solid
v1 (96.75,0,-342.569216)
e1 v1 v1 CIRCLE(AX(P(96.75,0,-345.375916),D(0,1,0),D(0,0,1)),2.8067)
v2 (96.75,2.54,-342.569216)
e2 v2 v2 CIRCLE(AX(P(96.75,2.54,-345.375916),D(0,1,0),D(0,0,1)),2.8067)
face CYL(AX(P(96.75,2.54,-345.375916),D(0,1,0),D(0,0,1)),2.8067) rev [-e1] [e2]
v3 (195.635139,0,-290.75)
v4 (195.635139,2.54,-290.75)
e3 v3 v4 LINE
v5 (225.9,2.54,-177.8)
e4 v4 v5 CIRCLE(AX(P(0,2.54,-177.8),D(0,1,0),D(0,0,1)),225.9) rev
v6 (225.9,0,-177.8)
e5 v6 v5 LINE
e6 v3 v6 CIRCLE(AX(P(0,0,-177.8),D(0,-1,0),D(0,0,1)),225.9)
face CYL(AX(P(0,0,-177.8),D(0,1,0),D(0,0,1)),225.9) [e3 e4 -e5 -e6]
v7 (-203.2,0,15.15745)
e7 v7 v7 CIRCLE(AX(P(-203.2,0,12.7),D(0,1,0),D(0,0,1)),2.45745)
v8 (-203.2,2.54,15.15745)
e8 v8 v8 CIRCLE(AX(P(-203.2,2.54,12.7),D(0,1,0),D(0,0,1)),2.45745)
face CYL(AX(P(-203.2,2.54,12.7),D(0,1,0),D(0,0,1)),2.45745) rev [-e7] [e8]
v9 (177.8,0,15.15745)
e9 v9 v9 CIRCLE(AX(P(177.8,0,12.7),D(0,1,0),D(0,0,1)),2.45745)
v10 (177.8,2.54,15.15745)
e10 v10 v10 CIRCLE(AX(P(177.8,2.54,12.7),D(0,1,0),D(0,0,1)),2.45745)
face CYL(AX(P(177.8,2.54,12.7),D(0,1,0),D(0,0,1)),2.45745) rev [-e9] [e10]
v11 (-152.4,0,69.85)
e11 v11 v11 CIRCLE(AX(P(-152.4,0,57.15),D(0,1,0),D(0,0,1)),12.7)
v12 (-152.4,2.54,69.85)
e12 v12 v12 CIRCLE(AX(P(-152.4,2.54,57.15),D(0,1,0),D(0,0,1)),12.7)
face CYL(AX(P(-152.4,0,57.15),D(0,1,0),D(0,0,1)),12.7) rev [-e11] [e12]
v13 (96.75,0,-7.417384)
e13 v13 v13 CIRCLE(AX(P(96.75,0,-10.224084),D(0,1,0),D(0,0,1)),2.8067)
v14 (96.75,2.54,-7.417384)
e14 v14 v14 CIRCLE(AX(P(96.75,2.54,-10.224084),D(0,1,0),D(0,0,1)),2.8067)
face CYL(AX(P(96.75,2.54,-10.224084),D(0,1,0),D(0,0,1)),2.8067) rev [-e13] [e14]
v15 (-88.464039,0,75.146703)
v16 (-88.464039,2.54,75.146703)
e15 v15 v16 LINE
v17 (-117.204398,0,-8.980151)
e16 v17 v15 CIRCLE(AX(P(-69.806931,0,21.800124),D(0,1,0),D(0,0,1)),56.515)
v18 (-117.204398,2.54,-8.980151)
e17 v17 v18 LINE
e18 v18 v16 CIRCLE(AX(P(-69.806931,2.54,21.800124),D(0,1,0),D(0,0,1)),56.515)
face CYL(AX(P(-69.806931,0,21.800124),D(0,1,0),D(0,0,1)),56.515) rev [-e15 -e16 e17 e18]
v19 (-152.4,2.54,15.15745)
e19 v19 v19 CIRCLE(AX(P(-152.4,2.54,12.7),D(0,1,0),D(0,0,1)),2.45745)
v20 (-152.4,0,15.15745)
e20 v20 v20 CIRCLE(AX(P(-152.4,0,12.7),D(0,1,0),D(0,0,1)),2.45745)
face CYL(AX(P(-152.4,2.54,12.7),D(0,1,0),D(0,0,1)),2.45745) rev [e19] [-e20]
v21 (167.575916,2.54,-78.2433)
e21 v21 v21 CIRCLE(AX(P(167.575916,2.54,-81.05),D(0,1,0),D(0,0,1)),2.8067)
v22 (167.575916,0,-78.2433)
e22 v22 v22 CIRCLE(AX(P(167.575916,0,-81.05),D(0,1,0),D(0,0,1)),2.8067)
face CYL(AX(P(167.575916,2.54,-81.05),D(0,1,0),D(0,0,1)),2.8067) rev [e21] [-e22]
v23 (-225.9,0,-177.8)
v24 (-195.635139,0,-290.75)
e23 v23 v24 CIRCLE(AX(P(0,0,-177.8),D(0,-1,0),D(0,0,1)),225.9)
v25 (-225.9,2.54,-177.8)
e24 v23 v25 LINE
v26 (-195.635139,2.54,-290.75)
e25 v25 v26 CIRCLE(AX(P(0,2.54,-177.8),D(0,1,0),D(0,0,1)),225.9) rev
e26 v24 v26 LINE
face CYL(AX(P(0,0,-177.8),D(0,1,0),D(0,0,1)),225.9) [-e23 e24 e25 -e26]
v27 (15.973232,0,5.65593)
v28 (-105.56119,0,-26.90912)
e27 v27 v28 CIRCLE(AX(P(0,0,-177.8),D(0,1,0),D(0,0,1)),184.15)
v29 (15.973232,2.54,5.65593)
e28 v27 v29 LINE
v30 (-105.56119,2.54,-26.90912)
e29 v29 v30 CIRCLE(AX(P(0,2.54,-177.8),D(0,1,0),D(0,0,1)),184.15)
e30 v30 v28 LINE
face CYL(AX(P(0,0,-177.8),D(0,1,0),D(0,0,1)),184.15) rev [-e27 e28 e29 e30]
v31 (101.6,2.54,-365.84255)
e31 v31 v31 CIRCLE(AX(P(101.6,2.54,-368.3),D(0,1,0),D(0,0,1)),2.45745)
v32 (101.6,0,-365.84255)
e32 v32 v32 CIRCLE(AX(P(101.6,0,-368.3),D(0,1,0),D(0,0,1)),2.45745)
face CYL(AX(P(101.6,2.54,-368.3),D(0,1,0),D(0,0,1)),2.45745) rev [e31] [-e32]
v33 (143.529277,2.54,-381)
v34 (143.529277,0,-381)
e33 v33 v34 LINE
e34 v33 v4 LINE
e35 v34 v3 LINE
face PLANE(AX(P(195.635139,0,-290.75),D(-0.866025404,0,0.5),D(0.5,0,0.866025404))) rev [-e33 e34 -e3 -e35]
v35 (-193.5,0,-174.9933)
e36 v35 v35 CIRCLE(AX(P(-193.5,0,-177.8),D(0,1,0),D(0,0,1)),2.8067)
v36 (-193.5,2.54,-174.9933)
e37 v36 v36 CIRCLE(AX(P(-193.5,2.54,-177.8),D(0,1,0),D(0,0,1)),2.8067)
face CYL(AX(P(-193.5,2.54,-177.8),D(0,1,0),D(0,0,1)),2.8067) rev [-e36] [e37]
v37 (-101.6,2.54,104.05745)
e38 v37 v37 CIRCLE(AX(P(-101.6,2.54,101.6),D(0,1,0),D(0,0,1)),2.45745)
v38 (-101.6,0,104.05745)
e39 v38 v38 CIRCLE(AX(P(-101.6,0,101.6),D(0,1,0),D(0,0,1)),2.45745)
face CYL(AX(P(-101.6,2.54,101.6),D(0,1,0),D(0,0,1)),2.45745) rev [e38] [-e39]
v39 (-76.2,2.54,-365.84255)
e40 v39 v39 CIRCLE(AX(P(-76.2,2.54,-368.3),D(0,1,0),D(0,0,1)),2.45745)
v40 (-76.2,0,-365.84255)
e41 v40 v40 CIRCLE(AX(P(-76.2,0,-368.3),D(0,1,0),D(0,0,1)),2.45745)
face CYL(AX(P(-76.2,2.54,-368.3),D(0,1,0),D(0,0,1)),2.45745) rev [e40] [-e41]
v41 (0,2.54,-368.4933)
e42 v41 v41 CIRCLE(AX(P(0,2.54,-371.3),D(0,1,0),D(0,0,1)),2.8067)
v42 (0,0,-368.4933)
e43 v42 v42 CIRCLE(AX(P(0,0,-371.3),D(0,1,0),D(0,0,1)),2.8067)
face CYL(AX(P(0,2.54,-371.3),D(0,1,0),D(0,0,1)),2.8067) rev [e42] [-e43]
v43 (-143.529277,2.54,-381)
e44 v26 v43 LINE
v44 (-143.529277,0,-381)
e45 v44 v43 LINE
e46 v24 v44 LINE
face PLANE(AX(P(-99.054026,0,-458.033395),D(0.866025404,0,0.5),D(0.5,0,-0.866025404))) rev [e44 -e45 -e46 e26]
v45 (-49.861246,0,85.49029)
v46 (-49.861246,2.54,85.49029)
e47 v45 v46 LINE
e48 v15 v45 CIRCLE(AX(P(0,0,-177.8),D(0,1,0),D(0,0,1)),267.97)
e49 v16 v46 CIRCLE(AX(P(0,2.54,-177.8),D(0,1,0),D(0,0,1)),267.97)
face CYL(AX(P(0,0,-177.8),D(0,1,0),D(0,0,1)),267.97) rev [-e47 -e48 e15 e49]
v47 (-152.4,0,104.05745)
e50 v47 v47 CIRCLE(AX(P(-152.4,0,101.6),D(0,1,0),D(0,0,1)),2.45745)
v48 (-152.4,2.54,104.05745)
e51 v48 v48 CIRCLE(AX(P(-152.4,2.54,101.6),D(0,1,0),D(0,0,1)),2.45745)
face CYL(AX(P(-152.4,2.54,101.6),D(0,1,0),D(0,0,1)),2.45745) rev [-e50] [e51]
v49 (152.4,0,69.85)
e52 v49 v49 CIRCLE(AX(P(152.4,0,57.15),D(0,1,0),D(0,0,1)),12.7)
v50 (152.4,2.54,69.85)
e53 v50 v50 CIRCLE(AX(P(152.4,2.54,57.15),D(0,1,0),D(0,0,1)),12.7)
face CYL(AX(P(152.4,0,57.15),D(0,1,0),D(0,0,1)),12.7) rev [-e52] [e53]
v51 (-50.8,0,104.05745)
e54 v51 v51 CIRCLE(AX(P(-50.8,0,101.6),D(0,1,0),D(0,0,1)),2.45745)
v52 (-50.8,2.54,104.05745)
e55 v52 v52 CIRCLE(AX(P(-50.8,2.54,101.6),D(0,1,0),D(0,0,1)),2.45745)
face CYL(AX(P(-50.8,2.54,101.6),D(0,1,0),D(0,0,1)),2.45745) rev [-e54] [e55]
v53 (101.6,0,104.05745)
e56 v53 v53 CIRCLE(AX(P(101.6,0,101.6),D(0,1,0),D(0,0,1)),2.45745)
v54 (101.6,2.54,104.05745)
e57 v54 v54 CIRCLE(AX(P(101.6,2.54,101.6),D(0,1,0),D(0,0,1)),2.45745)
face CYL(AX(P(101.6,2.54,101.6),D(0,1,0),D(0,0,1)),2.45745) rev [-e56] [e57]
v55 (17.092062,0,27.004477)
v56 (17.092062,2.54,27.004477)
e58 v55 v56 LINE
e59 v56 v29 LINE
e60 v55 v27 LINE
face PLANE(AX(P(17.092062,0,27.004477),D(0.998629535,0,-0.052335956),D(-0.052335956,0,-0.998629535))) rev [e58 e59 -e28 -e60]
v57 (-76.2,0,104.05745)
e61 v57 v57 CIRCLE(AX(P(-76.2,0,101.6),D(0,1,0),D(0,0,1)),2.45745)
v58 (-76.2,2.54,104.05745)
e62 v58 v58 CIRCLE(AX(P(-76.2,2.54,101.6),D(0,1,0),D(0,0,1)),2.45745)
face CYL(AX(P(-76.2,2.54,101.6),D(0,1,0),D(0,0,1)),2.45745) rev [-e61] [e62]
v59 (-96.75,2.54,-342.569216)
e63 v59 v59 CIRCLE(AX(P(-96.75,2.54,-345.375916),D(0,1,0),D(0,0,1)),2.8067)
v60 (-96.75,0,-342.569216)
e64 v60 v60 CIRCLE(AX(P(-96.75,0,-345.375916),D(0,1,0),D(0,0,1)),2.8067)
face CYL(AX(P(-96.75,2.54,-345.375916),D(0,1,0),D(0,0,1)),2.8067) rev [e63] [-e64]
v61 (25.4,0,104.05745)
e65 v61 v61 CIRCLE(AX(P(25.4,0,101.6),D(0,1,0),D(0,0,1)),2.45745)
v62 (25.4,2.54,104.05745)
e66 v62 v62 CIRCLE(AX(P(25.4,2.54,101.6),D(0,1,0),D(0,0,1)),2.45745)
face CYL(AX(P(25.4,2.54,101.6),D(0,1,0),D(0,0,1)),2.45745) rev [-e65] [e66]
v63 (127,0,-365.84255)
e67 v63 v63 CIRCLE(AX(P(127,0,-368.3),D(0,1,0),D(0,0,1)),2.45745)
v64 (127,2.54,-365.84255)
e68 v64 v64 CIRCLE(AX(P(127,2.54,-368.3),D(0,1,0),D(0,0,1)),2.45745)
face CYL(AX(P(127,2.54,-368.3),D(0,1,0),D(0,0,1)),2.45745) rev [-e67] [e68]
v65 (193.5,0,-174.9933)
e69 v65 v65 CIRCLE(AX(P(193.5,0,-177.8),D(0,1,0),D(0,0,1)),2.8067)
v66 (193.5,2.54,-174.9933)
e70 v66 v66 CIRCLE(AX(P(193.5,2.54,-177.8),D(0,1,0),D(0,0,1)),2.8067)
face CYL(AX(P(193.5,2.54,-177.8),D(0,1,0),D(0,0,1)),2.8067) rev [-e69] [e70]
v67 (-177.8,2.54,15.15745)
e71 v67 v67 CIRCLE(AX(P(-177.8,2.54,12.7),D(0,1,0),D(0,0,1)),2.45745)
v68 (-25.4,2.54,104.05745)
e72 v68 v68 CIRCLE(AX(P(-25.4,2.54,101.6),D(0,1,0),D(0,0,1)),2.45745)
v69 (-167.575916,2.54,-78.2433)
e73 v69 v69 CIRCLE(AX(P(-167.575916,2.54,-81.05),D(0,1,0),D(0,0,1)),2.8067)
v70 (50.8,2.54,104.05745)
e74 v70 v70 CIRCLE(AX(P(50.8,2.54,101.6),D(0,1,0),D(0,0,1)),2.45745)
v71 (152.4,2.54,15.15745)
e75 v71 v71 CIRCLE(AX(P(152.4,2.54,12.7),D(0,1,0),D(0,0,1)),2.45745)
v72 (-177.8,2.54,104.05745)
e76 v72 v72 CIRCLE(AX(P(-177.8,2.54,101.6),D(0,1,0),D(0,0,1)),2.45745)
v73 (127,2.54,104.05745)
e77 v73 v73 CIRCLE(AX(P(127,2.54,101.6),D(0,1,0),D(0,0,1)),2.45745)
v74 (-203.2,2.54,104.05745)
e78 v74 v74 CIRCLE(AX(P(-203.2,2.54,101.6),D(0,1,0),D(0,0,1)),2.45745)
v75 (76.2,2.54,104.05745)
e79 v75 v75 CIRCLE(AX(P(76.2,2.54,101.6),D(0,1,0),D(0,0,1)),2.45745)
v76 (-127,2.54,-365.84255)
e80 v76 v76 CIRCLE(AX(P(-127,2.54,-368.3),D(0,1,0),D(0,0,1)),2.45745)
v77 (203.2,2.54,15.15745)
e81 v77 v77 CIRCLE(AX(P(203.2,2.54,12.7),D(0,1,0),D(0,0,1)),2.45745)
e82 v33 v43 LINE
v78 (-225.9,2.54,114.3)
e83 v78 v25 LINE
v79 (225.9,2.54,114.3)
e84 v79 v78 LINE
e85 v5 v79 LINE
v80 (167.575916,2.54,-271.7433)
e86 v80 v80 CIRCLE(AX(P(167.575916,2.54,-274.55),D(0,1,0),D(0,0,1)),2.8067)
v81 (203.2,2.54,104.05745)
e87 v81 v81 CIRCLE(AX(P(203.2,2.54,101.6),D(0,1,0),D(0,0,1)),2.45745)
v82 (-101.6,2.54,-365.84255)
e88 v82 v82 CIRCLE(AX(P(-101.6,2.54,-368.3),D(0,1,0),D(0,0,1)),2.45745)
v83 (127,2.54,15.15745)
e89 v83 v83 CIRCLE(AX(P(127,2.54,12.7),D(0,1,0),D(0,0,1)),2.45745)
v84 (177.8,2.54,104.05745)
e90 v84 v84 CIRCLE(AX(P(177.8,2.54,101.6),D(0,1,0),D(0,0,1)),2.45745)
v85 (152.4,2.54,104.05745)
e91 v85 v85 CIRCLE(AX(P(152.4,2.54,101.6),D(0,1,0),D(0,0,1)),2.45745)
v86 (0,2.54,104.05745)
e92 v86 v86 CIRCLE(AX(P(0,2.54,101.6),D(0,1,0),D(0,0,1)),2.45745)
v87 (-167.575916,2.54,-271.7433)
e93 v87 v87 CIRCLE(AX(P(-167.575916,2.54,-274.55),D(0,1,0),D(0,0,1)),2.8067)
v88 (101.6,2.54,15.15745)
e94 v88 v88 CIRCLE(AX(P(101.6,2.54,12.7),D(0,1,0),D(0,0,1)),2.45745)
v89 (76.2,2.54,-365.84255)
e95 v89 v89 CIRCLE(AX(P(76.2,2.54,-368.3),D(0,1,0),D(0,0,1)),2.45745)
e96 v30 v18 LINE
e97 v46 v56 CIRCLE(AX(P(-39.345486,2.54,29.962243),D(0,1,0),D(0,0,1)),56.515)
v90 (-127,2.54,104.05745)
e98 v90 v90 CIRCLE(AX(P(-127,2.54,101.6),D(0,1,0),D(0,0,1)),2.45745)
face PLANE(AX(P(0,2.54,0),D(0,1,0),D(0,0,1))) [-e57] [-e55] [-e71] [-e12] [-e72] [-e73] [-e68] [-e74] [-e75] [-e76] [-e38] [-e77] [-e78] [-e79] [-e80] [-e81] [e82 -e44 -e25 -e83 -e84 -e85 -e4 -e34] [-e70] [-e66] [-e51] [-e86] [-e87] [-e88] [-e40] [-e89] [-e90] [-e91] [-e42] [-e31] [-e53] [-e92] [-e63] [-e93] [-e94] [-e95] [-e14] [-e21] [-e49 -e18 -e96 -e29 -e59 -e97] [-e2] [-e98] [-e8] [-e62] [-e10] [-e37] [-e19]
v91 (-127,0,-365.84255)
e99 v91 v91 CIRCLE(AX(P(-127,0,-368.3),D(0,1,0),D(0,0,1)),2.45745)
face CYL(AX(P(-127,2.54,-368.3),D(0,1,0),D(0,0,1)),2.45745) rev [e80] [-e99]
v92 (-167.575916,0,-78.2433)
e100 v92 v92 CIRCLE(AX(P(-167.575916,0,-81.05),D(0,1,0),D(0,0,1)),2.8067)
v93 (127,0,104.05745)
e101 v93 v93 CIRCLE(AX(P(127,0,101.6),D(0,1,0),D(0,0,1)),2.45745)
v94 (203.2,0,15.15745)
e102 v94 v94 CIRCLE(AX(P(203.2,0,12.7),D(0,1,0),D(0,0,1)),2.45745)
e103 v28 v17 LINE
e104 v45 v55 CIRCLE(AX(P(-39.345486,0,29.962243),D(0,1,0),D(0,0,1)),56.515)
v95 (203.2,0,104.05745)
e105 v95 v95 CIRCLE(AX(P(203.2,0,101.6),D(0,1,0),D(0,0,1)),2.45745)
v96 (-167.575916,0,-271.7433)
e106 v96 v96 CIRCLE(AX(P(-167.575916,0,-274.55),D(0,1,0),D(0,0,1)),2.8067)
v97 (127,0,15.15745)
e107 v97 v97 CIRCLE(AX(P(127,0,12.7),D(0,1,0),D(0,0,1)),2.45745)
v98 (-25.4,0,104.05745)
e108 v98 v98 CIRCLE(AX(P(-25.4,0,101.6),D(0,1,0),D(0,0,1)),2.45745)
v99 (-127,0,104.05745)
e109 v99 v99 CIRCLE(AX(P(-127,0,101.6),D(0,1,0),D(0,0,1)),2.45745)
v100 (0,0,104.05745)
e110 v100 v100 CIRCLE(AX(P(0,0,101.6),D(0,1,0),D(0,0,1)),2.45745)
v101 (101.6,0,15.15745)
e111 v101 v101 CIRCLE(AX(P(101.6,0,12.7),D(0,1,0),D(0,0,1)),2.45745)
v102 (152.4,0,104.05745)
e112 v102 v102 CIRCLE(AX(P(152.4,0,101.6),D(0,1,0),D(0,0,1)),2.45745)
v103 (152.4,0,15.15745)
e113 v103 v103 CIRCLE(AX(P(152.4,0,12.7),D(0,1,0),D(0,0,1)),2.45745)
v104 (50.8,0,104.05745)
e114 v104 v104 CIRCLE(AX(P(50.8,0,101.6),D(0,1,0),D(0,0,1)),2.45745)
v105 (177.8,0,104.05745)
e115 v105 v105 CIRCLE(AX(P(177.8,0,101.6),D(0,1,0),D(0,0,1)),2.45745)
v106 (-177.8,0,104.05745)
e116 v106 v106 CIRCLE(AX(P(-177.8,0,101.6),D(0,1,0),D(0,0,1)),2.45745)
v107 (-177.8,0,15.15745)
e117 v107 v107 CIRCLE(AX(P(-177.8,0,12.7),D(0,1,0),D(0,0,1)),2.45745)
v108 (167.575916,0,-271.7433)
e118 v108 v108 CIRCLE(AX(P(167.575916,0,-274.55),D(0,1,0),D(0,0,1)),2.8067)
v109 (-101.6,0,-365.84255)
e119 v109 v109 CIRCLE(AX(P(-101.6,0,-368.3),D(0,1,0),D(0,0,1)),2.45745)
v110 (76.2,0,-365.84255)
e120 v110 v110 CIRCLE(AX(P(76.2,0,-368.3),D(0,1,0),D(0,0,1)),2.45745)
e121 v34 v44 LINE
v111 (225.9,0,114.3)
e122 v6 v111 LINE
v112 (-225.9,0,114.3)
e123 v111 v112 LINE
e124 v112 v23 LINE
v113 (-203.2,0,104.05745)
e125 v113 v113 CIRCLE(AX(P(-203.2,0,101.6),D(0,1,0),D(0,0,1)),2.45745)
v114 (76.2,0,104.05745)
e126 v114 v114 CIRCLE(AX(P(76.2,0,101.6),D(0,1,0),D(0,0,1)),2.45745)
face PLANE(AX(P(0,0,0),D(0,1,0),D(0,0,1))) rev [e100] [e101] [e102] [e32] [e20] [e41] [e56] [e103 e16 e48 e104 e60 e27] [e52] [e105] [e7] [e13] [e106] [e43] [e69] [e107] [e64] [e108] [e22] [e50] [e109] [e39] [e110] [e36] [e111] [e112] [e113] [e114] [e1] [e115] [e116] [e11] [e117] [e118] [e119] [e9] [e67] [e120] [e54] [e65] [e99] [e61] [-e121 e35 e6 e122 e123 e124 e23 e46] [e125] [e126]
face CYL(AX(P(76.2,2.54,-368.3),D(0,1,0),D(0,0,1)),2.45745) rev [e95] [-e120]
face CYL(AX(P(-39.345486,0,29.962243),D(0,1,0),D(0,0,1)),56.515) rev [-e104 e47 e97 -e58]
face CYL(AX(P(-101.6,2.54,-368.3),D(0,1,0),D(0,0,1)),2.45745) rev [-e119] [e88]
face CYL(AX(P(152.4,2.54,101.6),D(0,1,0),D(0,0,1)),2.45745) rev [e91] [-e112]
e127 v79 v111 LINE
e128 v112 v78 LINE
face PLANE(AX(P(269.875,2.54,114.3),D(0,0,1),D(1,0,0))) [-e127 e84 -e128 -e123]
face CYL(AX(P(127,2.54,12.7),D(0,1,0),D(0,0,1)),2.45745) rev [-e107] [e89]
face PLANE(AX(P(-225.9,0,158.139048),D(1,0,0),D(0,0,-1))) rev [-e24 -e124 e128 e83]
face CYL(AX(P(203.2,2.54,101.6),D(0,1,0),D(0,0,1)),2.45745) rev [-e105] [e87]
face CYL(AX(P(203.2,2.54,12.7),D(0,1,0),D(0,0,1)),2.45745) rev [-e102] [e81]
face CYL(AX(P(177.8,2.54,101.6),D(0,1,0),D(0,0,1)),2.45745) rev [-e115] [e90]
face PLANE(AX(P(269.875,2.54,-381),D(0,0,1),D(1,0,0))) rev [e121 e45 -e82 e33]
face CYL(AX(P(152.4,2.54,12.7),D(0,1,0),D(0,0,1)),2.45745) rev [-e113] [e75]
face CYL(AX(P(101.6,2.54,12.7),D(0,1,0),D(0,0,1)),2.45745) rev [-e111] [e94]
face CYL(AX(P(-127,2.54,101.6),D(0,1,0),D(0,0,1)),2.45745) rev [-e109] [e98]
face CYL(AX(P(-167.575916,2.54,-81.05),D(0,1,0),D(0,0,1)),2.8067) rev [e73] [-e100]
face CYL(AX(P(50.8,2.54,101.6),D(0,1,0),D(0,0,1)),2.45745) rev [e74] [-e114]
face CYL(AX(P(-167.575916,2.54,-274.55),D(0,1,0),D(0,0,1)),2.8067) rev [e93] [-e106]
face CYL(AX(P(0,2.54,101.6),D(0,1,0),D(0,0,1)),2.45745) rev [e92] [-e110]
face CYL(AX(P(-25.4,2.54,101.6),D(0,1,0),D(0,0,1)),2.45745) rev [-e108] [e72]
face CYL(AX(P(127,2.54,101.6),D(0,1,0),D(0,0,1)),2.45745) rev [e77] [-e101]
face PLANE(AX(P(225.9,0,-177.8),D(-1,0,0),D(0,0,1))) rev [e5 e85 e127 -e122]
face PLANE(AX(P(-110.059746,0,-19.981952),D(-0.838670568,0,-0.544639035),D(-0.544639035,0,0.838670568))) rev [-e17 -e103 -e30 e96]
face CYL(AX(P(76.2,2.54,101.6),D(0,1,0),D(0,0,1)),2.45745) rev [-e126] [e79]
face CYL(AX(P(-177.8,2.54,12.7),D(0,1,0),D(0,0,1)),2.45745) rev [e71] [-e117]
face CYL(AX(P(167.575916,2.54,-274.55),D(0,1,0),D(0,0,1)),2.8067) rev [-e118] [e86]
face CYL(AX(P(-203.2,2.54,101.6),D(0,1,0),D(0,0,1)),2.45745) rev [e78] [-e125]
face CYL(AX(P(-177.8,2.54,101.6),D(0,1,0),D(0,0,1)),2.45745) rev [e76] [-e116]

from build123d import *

# Parameters (mm, degrees)
SKETCH1_W               = 539.75
SKETCH1_H               = 495.3
BOSS_EXTRUDE1_DEPTH     = 2.54
SKETCH2_R               = 184.15
CUT_EXTRUDE1_DEPTH      = 467.904666099
CUT_EXTRUDE3_DEPTH      = 443.942729481
CUT_EXTRUDE3_DEPTH_BACK = 443.942729481
SKETCH4_OUTSIDE_W       = 587.882
SKETCH4_OUTSIDE_H       = 631.382
DELETEFACE1_DEPTH       = 2.54
F_8_CLEARANCE_HOLE1_D   = 4.9149
F_10_CLEARANCE_HOLE1_D  = 5.6134
SKETCH10_R              = 12.7
CUT_EXTRUDE4_DEPTH      = 443.942729481


# Read off the part's stored shape, not the designer's step: DeleteFace1
with BuildPart() as part:
    # Sketch1 → Boss-Extrude1 (new body)
    with BuildSketch(Plane(origin=(0, 0, 0), x_dir=(1, 0, 0), z_dir=(0, 1, 0))):
        with Locations((0, 133.35)):
            Rectangle(SKETCH1_W, SKETCH1_H)
    extrude(amount=BOSS_EXTRUDE1_DEPTH)

    # Sketch2 → Cut-Extrude1 (cut, through all)
    with BuildSketch(Plane(origin=(0, 2.54, 0), x_dir=(1, 0, 0), z_dir=(0, 1, 0))):
        with Locations(Location((0, 177.8, 0), (0, 0, 270))):
            Circle(SKETCH2_R)
        with BuildLine():
            Line((195.635138715, 290.75), (99.054025744, 458.033394716))
            Line((99.054025744, 458.033394716), (644.549965459, 478.864376008))
            Line((644.549965459, 478.864376008), (667.56593599, -123.849355899))
            Line((667.56593599, -123.849355899), (225.9, -158.139047855))
            Line((225.9, -158.139047855), (225.9, 177.8))
            ThreePointArc((225.9, 177.8), (218.202644159, 236.267222289), (195.635138715, 290.75))
        make_face()
        with BuildLine():
            Line((-99.054025744, 458.033394716), (-195.635138715, 290.75))
            ThreePointArc((-195.635138715, 290.75), (-218.202644159, 236.267222289), (-225.9, 177.8))
            Line((-225.9, 177.8), (-225.9, -158.139047855))
            Line((-225.9, -158.139047855), (-512.847328359, -198.052843622))
            Line((-512.847328359, -198.052843622), (-480.715151615, 488.522350563))
            Line((-480.715151615, 488.522350563), (-99.054025744, 458.033394716))
        make_face()
    extrude(amount=-CUT_EXTRUDE1_DEPTH, mode=Mode.SUBTRACT)

    # Sketch4 outside → Cut-Extrude3 (cut, two sides: drawn at the far end of the back side and taken through both)
    # profile 1 of 2: a face of its own
    with BuildSketch(Plane(origin=(0, 2.54, 0), x_dir=(1, 0, 0), z_dir=(0, 1, 0)).offset(-CUT_EXTRUDE3_DEPTH_BACK)):
        with Locations((0, 133.35)):
            Rectangle(SKETCH4_OUTSIDE_W, SKETCH4_OUTSIDE_H)
        with BuildLine():
            Line((195.635138715, 290.75), (143.529276921, 381))
            Line((143.529276921, 381), (-143.529276921, 381))
            Line((-143.529276921, 381), (-195.635138715, 290.75))
            ThreePointArc((-195.635138715, 290.75), (-218.202644159, 236.267222289), (-225.9, 177.8))
            Line((-225.9, 177.8), (-225.9, -114.3))
            Line((-225.9, -114.3), (225.9, -114.3))
            Line((225.9, -114.3), (225.9, 177.8))
            ThreePointArc((225.9, 177.8), (218.202644159, 236.267222289), (195.635138715, 290.75))
        make_face(mode=Mode.SUBTRACT)
    # profile 2 of 2: a face of its own
    with BuildSketch(Plane(origin=(0, 2.54, 0), x_dir=(1, 0, 0), z_dir=(0, 1, 0)).offset(-CUT_EXTRUDE3_DEPTH_BACK)):
        with BuildLine():
            Line((17.092062212, -27.00447678), (16.405511664, -13.904311929))
            ThreePointArc((16.405511664, -13.904311929), (12.375480651, -5.272574167), (3.477179505, -1.871356225))
            ThreePointArc((3.477179505, -1.871356225), (-46.5110765, 4.218299387), (-92.847003898, 23.93863093))
            ThreePointArc((-92.847003898, 23.93863093), (-102.253767711, 25.442240361), (-110.059745828, 19.981951687))
            Line((-110.059745828, 19.981951687), (-117.204398469, 8.980151406))
            ThreePointArc((-117.204398469, 8.980151406), (-123.287148558, -40.070635127), (-88.464039092, -75.146703255))
            ThreePointArc((-88.464039092, -75.146703255), (-69.355739516, -81.039143671), (-49.861246452, -85.490290368))
            ThreePointArc((-49.861246452, -85.490290368), (-2.165514952, -72.525079038), (17.092062212, -27.00447678))
        make_face()
    extrude(amount=CUT_EXTRUDE3_DEPTH + CUT_EXTRUDE3_DEPTH_BACK, mode=Mode.SUBTRACT)

    # DeleteFace1 outline → DeleteFace1 (cut)
    with BuildSketch(Plane(origin=(0, 0, 0), x_dir=(1, 0, 0), z_dir=(0, 1, 0))):
        with BuildLine():
            ThreePointArc((-103.099865089, 25.216775763), (-104.333958967, 26.057957355), (-105.561190084, 26.909120064))
            Line((-105.561190084, 26.909120064), (-110.059745828, 19.981951687))
            ThreePointArc((-110.059745828, 19.981951687), (-107.042541375, 23.214587225), (-103.099865089, 25.216775763))
        make_face()
        with BuildLine():
            Line((16.405511664, -13.904311929), (15.973232299, -5.655930266))
            ThreePointArc((15.973232299, -5.655930266), (14.484837621, -5.779443236), (12.995490176, -5.890880925))
            ThreePointArc((12.995490176, -5.890880925), (15.408853729, -9.596165205), (16.405511664, -13.904311929))
        make_face()
    extrude(amount=DELETEFACE1_DEPTH, mode=Mode.SUBTRACT)

    # #8 Clearance Hole1 (through all)
    with Locations(Plane(origin=(0, 2.54, 0), x_dir=(1, 0, 0), z_dir=(0, 1, 0))):
        with Locations((127, -101.6), (101.6, -101.6), (76.2, -101.6), (50.8, -101.6), (25.4, -101.6), (0, -101.6), (-25.4, -101.6), (-50.8, -101.6), (-76.2, -101.6), (-101.6, -101.6), (-127, -101.6), (-152.4, -101.6), (-177.8, -101.6), (-203.2, -101.6), (-152.4, -12.7), (-177.8, -12.7), (-203.2, -12.7), (101.6, -12.7), (127, -12.7), (152.4, -12.7), (152.4, -101.6), (177.8, -101.6), (203.2, -101.6), (203.2, -12.7), (177.8, -12.7), (127, 368.3), (101.6, 368.3), (76.2, 368.3), (-76.2, 368.3), (-101.6, 368.3), (-127, 368.3)):
            Hole(F_8_CLEARANCE_HOLE1_D / 2)

    # #10 Clearance Hole1 (through all)
    with Locations(Plane(origin=(0, 2.54, 0), x_dir=(1, 0, 0), z_dir=(0, 1, 0))):
        with Locations((-167.575915632, 274.55), (-96.75, 345.375915632), (0, 371.3), (96.75, 345.375915632), (167.575915632, 274.55), (193.5, 177.8), (167.575915632, 81.05), (96.75, 10.224084368), (-167.575915632, 81.05), (-193.5, 177.8)):
            Hole(F_10_CLEARANCE_HOLE1_D / 2)

    # Sketch10 → Cut-Extrude4 (cut, through all)
    with BuildSketch(Plane(origin=(0, 2.54, 0), x_dir=(1, 0, 0), z_dir=(0, 1, 0))):
        with Locations(Location((-152.4, -57.15, 0), (0, 0, 270))):
            Circle(SKETCH10_R)
        with Locations(Location((152.4, -57.15, 0), (0, 0, 270))):
            Circle(SKETCH10_R)
    extrude(amount=-CUT_EXTRUDE4_DEPTH, mode=Mode.SUBTRACT)


solid = part.part
